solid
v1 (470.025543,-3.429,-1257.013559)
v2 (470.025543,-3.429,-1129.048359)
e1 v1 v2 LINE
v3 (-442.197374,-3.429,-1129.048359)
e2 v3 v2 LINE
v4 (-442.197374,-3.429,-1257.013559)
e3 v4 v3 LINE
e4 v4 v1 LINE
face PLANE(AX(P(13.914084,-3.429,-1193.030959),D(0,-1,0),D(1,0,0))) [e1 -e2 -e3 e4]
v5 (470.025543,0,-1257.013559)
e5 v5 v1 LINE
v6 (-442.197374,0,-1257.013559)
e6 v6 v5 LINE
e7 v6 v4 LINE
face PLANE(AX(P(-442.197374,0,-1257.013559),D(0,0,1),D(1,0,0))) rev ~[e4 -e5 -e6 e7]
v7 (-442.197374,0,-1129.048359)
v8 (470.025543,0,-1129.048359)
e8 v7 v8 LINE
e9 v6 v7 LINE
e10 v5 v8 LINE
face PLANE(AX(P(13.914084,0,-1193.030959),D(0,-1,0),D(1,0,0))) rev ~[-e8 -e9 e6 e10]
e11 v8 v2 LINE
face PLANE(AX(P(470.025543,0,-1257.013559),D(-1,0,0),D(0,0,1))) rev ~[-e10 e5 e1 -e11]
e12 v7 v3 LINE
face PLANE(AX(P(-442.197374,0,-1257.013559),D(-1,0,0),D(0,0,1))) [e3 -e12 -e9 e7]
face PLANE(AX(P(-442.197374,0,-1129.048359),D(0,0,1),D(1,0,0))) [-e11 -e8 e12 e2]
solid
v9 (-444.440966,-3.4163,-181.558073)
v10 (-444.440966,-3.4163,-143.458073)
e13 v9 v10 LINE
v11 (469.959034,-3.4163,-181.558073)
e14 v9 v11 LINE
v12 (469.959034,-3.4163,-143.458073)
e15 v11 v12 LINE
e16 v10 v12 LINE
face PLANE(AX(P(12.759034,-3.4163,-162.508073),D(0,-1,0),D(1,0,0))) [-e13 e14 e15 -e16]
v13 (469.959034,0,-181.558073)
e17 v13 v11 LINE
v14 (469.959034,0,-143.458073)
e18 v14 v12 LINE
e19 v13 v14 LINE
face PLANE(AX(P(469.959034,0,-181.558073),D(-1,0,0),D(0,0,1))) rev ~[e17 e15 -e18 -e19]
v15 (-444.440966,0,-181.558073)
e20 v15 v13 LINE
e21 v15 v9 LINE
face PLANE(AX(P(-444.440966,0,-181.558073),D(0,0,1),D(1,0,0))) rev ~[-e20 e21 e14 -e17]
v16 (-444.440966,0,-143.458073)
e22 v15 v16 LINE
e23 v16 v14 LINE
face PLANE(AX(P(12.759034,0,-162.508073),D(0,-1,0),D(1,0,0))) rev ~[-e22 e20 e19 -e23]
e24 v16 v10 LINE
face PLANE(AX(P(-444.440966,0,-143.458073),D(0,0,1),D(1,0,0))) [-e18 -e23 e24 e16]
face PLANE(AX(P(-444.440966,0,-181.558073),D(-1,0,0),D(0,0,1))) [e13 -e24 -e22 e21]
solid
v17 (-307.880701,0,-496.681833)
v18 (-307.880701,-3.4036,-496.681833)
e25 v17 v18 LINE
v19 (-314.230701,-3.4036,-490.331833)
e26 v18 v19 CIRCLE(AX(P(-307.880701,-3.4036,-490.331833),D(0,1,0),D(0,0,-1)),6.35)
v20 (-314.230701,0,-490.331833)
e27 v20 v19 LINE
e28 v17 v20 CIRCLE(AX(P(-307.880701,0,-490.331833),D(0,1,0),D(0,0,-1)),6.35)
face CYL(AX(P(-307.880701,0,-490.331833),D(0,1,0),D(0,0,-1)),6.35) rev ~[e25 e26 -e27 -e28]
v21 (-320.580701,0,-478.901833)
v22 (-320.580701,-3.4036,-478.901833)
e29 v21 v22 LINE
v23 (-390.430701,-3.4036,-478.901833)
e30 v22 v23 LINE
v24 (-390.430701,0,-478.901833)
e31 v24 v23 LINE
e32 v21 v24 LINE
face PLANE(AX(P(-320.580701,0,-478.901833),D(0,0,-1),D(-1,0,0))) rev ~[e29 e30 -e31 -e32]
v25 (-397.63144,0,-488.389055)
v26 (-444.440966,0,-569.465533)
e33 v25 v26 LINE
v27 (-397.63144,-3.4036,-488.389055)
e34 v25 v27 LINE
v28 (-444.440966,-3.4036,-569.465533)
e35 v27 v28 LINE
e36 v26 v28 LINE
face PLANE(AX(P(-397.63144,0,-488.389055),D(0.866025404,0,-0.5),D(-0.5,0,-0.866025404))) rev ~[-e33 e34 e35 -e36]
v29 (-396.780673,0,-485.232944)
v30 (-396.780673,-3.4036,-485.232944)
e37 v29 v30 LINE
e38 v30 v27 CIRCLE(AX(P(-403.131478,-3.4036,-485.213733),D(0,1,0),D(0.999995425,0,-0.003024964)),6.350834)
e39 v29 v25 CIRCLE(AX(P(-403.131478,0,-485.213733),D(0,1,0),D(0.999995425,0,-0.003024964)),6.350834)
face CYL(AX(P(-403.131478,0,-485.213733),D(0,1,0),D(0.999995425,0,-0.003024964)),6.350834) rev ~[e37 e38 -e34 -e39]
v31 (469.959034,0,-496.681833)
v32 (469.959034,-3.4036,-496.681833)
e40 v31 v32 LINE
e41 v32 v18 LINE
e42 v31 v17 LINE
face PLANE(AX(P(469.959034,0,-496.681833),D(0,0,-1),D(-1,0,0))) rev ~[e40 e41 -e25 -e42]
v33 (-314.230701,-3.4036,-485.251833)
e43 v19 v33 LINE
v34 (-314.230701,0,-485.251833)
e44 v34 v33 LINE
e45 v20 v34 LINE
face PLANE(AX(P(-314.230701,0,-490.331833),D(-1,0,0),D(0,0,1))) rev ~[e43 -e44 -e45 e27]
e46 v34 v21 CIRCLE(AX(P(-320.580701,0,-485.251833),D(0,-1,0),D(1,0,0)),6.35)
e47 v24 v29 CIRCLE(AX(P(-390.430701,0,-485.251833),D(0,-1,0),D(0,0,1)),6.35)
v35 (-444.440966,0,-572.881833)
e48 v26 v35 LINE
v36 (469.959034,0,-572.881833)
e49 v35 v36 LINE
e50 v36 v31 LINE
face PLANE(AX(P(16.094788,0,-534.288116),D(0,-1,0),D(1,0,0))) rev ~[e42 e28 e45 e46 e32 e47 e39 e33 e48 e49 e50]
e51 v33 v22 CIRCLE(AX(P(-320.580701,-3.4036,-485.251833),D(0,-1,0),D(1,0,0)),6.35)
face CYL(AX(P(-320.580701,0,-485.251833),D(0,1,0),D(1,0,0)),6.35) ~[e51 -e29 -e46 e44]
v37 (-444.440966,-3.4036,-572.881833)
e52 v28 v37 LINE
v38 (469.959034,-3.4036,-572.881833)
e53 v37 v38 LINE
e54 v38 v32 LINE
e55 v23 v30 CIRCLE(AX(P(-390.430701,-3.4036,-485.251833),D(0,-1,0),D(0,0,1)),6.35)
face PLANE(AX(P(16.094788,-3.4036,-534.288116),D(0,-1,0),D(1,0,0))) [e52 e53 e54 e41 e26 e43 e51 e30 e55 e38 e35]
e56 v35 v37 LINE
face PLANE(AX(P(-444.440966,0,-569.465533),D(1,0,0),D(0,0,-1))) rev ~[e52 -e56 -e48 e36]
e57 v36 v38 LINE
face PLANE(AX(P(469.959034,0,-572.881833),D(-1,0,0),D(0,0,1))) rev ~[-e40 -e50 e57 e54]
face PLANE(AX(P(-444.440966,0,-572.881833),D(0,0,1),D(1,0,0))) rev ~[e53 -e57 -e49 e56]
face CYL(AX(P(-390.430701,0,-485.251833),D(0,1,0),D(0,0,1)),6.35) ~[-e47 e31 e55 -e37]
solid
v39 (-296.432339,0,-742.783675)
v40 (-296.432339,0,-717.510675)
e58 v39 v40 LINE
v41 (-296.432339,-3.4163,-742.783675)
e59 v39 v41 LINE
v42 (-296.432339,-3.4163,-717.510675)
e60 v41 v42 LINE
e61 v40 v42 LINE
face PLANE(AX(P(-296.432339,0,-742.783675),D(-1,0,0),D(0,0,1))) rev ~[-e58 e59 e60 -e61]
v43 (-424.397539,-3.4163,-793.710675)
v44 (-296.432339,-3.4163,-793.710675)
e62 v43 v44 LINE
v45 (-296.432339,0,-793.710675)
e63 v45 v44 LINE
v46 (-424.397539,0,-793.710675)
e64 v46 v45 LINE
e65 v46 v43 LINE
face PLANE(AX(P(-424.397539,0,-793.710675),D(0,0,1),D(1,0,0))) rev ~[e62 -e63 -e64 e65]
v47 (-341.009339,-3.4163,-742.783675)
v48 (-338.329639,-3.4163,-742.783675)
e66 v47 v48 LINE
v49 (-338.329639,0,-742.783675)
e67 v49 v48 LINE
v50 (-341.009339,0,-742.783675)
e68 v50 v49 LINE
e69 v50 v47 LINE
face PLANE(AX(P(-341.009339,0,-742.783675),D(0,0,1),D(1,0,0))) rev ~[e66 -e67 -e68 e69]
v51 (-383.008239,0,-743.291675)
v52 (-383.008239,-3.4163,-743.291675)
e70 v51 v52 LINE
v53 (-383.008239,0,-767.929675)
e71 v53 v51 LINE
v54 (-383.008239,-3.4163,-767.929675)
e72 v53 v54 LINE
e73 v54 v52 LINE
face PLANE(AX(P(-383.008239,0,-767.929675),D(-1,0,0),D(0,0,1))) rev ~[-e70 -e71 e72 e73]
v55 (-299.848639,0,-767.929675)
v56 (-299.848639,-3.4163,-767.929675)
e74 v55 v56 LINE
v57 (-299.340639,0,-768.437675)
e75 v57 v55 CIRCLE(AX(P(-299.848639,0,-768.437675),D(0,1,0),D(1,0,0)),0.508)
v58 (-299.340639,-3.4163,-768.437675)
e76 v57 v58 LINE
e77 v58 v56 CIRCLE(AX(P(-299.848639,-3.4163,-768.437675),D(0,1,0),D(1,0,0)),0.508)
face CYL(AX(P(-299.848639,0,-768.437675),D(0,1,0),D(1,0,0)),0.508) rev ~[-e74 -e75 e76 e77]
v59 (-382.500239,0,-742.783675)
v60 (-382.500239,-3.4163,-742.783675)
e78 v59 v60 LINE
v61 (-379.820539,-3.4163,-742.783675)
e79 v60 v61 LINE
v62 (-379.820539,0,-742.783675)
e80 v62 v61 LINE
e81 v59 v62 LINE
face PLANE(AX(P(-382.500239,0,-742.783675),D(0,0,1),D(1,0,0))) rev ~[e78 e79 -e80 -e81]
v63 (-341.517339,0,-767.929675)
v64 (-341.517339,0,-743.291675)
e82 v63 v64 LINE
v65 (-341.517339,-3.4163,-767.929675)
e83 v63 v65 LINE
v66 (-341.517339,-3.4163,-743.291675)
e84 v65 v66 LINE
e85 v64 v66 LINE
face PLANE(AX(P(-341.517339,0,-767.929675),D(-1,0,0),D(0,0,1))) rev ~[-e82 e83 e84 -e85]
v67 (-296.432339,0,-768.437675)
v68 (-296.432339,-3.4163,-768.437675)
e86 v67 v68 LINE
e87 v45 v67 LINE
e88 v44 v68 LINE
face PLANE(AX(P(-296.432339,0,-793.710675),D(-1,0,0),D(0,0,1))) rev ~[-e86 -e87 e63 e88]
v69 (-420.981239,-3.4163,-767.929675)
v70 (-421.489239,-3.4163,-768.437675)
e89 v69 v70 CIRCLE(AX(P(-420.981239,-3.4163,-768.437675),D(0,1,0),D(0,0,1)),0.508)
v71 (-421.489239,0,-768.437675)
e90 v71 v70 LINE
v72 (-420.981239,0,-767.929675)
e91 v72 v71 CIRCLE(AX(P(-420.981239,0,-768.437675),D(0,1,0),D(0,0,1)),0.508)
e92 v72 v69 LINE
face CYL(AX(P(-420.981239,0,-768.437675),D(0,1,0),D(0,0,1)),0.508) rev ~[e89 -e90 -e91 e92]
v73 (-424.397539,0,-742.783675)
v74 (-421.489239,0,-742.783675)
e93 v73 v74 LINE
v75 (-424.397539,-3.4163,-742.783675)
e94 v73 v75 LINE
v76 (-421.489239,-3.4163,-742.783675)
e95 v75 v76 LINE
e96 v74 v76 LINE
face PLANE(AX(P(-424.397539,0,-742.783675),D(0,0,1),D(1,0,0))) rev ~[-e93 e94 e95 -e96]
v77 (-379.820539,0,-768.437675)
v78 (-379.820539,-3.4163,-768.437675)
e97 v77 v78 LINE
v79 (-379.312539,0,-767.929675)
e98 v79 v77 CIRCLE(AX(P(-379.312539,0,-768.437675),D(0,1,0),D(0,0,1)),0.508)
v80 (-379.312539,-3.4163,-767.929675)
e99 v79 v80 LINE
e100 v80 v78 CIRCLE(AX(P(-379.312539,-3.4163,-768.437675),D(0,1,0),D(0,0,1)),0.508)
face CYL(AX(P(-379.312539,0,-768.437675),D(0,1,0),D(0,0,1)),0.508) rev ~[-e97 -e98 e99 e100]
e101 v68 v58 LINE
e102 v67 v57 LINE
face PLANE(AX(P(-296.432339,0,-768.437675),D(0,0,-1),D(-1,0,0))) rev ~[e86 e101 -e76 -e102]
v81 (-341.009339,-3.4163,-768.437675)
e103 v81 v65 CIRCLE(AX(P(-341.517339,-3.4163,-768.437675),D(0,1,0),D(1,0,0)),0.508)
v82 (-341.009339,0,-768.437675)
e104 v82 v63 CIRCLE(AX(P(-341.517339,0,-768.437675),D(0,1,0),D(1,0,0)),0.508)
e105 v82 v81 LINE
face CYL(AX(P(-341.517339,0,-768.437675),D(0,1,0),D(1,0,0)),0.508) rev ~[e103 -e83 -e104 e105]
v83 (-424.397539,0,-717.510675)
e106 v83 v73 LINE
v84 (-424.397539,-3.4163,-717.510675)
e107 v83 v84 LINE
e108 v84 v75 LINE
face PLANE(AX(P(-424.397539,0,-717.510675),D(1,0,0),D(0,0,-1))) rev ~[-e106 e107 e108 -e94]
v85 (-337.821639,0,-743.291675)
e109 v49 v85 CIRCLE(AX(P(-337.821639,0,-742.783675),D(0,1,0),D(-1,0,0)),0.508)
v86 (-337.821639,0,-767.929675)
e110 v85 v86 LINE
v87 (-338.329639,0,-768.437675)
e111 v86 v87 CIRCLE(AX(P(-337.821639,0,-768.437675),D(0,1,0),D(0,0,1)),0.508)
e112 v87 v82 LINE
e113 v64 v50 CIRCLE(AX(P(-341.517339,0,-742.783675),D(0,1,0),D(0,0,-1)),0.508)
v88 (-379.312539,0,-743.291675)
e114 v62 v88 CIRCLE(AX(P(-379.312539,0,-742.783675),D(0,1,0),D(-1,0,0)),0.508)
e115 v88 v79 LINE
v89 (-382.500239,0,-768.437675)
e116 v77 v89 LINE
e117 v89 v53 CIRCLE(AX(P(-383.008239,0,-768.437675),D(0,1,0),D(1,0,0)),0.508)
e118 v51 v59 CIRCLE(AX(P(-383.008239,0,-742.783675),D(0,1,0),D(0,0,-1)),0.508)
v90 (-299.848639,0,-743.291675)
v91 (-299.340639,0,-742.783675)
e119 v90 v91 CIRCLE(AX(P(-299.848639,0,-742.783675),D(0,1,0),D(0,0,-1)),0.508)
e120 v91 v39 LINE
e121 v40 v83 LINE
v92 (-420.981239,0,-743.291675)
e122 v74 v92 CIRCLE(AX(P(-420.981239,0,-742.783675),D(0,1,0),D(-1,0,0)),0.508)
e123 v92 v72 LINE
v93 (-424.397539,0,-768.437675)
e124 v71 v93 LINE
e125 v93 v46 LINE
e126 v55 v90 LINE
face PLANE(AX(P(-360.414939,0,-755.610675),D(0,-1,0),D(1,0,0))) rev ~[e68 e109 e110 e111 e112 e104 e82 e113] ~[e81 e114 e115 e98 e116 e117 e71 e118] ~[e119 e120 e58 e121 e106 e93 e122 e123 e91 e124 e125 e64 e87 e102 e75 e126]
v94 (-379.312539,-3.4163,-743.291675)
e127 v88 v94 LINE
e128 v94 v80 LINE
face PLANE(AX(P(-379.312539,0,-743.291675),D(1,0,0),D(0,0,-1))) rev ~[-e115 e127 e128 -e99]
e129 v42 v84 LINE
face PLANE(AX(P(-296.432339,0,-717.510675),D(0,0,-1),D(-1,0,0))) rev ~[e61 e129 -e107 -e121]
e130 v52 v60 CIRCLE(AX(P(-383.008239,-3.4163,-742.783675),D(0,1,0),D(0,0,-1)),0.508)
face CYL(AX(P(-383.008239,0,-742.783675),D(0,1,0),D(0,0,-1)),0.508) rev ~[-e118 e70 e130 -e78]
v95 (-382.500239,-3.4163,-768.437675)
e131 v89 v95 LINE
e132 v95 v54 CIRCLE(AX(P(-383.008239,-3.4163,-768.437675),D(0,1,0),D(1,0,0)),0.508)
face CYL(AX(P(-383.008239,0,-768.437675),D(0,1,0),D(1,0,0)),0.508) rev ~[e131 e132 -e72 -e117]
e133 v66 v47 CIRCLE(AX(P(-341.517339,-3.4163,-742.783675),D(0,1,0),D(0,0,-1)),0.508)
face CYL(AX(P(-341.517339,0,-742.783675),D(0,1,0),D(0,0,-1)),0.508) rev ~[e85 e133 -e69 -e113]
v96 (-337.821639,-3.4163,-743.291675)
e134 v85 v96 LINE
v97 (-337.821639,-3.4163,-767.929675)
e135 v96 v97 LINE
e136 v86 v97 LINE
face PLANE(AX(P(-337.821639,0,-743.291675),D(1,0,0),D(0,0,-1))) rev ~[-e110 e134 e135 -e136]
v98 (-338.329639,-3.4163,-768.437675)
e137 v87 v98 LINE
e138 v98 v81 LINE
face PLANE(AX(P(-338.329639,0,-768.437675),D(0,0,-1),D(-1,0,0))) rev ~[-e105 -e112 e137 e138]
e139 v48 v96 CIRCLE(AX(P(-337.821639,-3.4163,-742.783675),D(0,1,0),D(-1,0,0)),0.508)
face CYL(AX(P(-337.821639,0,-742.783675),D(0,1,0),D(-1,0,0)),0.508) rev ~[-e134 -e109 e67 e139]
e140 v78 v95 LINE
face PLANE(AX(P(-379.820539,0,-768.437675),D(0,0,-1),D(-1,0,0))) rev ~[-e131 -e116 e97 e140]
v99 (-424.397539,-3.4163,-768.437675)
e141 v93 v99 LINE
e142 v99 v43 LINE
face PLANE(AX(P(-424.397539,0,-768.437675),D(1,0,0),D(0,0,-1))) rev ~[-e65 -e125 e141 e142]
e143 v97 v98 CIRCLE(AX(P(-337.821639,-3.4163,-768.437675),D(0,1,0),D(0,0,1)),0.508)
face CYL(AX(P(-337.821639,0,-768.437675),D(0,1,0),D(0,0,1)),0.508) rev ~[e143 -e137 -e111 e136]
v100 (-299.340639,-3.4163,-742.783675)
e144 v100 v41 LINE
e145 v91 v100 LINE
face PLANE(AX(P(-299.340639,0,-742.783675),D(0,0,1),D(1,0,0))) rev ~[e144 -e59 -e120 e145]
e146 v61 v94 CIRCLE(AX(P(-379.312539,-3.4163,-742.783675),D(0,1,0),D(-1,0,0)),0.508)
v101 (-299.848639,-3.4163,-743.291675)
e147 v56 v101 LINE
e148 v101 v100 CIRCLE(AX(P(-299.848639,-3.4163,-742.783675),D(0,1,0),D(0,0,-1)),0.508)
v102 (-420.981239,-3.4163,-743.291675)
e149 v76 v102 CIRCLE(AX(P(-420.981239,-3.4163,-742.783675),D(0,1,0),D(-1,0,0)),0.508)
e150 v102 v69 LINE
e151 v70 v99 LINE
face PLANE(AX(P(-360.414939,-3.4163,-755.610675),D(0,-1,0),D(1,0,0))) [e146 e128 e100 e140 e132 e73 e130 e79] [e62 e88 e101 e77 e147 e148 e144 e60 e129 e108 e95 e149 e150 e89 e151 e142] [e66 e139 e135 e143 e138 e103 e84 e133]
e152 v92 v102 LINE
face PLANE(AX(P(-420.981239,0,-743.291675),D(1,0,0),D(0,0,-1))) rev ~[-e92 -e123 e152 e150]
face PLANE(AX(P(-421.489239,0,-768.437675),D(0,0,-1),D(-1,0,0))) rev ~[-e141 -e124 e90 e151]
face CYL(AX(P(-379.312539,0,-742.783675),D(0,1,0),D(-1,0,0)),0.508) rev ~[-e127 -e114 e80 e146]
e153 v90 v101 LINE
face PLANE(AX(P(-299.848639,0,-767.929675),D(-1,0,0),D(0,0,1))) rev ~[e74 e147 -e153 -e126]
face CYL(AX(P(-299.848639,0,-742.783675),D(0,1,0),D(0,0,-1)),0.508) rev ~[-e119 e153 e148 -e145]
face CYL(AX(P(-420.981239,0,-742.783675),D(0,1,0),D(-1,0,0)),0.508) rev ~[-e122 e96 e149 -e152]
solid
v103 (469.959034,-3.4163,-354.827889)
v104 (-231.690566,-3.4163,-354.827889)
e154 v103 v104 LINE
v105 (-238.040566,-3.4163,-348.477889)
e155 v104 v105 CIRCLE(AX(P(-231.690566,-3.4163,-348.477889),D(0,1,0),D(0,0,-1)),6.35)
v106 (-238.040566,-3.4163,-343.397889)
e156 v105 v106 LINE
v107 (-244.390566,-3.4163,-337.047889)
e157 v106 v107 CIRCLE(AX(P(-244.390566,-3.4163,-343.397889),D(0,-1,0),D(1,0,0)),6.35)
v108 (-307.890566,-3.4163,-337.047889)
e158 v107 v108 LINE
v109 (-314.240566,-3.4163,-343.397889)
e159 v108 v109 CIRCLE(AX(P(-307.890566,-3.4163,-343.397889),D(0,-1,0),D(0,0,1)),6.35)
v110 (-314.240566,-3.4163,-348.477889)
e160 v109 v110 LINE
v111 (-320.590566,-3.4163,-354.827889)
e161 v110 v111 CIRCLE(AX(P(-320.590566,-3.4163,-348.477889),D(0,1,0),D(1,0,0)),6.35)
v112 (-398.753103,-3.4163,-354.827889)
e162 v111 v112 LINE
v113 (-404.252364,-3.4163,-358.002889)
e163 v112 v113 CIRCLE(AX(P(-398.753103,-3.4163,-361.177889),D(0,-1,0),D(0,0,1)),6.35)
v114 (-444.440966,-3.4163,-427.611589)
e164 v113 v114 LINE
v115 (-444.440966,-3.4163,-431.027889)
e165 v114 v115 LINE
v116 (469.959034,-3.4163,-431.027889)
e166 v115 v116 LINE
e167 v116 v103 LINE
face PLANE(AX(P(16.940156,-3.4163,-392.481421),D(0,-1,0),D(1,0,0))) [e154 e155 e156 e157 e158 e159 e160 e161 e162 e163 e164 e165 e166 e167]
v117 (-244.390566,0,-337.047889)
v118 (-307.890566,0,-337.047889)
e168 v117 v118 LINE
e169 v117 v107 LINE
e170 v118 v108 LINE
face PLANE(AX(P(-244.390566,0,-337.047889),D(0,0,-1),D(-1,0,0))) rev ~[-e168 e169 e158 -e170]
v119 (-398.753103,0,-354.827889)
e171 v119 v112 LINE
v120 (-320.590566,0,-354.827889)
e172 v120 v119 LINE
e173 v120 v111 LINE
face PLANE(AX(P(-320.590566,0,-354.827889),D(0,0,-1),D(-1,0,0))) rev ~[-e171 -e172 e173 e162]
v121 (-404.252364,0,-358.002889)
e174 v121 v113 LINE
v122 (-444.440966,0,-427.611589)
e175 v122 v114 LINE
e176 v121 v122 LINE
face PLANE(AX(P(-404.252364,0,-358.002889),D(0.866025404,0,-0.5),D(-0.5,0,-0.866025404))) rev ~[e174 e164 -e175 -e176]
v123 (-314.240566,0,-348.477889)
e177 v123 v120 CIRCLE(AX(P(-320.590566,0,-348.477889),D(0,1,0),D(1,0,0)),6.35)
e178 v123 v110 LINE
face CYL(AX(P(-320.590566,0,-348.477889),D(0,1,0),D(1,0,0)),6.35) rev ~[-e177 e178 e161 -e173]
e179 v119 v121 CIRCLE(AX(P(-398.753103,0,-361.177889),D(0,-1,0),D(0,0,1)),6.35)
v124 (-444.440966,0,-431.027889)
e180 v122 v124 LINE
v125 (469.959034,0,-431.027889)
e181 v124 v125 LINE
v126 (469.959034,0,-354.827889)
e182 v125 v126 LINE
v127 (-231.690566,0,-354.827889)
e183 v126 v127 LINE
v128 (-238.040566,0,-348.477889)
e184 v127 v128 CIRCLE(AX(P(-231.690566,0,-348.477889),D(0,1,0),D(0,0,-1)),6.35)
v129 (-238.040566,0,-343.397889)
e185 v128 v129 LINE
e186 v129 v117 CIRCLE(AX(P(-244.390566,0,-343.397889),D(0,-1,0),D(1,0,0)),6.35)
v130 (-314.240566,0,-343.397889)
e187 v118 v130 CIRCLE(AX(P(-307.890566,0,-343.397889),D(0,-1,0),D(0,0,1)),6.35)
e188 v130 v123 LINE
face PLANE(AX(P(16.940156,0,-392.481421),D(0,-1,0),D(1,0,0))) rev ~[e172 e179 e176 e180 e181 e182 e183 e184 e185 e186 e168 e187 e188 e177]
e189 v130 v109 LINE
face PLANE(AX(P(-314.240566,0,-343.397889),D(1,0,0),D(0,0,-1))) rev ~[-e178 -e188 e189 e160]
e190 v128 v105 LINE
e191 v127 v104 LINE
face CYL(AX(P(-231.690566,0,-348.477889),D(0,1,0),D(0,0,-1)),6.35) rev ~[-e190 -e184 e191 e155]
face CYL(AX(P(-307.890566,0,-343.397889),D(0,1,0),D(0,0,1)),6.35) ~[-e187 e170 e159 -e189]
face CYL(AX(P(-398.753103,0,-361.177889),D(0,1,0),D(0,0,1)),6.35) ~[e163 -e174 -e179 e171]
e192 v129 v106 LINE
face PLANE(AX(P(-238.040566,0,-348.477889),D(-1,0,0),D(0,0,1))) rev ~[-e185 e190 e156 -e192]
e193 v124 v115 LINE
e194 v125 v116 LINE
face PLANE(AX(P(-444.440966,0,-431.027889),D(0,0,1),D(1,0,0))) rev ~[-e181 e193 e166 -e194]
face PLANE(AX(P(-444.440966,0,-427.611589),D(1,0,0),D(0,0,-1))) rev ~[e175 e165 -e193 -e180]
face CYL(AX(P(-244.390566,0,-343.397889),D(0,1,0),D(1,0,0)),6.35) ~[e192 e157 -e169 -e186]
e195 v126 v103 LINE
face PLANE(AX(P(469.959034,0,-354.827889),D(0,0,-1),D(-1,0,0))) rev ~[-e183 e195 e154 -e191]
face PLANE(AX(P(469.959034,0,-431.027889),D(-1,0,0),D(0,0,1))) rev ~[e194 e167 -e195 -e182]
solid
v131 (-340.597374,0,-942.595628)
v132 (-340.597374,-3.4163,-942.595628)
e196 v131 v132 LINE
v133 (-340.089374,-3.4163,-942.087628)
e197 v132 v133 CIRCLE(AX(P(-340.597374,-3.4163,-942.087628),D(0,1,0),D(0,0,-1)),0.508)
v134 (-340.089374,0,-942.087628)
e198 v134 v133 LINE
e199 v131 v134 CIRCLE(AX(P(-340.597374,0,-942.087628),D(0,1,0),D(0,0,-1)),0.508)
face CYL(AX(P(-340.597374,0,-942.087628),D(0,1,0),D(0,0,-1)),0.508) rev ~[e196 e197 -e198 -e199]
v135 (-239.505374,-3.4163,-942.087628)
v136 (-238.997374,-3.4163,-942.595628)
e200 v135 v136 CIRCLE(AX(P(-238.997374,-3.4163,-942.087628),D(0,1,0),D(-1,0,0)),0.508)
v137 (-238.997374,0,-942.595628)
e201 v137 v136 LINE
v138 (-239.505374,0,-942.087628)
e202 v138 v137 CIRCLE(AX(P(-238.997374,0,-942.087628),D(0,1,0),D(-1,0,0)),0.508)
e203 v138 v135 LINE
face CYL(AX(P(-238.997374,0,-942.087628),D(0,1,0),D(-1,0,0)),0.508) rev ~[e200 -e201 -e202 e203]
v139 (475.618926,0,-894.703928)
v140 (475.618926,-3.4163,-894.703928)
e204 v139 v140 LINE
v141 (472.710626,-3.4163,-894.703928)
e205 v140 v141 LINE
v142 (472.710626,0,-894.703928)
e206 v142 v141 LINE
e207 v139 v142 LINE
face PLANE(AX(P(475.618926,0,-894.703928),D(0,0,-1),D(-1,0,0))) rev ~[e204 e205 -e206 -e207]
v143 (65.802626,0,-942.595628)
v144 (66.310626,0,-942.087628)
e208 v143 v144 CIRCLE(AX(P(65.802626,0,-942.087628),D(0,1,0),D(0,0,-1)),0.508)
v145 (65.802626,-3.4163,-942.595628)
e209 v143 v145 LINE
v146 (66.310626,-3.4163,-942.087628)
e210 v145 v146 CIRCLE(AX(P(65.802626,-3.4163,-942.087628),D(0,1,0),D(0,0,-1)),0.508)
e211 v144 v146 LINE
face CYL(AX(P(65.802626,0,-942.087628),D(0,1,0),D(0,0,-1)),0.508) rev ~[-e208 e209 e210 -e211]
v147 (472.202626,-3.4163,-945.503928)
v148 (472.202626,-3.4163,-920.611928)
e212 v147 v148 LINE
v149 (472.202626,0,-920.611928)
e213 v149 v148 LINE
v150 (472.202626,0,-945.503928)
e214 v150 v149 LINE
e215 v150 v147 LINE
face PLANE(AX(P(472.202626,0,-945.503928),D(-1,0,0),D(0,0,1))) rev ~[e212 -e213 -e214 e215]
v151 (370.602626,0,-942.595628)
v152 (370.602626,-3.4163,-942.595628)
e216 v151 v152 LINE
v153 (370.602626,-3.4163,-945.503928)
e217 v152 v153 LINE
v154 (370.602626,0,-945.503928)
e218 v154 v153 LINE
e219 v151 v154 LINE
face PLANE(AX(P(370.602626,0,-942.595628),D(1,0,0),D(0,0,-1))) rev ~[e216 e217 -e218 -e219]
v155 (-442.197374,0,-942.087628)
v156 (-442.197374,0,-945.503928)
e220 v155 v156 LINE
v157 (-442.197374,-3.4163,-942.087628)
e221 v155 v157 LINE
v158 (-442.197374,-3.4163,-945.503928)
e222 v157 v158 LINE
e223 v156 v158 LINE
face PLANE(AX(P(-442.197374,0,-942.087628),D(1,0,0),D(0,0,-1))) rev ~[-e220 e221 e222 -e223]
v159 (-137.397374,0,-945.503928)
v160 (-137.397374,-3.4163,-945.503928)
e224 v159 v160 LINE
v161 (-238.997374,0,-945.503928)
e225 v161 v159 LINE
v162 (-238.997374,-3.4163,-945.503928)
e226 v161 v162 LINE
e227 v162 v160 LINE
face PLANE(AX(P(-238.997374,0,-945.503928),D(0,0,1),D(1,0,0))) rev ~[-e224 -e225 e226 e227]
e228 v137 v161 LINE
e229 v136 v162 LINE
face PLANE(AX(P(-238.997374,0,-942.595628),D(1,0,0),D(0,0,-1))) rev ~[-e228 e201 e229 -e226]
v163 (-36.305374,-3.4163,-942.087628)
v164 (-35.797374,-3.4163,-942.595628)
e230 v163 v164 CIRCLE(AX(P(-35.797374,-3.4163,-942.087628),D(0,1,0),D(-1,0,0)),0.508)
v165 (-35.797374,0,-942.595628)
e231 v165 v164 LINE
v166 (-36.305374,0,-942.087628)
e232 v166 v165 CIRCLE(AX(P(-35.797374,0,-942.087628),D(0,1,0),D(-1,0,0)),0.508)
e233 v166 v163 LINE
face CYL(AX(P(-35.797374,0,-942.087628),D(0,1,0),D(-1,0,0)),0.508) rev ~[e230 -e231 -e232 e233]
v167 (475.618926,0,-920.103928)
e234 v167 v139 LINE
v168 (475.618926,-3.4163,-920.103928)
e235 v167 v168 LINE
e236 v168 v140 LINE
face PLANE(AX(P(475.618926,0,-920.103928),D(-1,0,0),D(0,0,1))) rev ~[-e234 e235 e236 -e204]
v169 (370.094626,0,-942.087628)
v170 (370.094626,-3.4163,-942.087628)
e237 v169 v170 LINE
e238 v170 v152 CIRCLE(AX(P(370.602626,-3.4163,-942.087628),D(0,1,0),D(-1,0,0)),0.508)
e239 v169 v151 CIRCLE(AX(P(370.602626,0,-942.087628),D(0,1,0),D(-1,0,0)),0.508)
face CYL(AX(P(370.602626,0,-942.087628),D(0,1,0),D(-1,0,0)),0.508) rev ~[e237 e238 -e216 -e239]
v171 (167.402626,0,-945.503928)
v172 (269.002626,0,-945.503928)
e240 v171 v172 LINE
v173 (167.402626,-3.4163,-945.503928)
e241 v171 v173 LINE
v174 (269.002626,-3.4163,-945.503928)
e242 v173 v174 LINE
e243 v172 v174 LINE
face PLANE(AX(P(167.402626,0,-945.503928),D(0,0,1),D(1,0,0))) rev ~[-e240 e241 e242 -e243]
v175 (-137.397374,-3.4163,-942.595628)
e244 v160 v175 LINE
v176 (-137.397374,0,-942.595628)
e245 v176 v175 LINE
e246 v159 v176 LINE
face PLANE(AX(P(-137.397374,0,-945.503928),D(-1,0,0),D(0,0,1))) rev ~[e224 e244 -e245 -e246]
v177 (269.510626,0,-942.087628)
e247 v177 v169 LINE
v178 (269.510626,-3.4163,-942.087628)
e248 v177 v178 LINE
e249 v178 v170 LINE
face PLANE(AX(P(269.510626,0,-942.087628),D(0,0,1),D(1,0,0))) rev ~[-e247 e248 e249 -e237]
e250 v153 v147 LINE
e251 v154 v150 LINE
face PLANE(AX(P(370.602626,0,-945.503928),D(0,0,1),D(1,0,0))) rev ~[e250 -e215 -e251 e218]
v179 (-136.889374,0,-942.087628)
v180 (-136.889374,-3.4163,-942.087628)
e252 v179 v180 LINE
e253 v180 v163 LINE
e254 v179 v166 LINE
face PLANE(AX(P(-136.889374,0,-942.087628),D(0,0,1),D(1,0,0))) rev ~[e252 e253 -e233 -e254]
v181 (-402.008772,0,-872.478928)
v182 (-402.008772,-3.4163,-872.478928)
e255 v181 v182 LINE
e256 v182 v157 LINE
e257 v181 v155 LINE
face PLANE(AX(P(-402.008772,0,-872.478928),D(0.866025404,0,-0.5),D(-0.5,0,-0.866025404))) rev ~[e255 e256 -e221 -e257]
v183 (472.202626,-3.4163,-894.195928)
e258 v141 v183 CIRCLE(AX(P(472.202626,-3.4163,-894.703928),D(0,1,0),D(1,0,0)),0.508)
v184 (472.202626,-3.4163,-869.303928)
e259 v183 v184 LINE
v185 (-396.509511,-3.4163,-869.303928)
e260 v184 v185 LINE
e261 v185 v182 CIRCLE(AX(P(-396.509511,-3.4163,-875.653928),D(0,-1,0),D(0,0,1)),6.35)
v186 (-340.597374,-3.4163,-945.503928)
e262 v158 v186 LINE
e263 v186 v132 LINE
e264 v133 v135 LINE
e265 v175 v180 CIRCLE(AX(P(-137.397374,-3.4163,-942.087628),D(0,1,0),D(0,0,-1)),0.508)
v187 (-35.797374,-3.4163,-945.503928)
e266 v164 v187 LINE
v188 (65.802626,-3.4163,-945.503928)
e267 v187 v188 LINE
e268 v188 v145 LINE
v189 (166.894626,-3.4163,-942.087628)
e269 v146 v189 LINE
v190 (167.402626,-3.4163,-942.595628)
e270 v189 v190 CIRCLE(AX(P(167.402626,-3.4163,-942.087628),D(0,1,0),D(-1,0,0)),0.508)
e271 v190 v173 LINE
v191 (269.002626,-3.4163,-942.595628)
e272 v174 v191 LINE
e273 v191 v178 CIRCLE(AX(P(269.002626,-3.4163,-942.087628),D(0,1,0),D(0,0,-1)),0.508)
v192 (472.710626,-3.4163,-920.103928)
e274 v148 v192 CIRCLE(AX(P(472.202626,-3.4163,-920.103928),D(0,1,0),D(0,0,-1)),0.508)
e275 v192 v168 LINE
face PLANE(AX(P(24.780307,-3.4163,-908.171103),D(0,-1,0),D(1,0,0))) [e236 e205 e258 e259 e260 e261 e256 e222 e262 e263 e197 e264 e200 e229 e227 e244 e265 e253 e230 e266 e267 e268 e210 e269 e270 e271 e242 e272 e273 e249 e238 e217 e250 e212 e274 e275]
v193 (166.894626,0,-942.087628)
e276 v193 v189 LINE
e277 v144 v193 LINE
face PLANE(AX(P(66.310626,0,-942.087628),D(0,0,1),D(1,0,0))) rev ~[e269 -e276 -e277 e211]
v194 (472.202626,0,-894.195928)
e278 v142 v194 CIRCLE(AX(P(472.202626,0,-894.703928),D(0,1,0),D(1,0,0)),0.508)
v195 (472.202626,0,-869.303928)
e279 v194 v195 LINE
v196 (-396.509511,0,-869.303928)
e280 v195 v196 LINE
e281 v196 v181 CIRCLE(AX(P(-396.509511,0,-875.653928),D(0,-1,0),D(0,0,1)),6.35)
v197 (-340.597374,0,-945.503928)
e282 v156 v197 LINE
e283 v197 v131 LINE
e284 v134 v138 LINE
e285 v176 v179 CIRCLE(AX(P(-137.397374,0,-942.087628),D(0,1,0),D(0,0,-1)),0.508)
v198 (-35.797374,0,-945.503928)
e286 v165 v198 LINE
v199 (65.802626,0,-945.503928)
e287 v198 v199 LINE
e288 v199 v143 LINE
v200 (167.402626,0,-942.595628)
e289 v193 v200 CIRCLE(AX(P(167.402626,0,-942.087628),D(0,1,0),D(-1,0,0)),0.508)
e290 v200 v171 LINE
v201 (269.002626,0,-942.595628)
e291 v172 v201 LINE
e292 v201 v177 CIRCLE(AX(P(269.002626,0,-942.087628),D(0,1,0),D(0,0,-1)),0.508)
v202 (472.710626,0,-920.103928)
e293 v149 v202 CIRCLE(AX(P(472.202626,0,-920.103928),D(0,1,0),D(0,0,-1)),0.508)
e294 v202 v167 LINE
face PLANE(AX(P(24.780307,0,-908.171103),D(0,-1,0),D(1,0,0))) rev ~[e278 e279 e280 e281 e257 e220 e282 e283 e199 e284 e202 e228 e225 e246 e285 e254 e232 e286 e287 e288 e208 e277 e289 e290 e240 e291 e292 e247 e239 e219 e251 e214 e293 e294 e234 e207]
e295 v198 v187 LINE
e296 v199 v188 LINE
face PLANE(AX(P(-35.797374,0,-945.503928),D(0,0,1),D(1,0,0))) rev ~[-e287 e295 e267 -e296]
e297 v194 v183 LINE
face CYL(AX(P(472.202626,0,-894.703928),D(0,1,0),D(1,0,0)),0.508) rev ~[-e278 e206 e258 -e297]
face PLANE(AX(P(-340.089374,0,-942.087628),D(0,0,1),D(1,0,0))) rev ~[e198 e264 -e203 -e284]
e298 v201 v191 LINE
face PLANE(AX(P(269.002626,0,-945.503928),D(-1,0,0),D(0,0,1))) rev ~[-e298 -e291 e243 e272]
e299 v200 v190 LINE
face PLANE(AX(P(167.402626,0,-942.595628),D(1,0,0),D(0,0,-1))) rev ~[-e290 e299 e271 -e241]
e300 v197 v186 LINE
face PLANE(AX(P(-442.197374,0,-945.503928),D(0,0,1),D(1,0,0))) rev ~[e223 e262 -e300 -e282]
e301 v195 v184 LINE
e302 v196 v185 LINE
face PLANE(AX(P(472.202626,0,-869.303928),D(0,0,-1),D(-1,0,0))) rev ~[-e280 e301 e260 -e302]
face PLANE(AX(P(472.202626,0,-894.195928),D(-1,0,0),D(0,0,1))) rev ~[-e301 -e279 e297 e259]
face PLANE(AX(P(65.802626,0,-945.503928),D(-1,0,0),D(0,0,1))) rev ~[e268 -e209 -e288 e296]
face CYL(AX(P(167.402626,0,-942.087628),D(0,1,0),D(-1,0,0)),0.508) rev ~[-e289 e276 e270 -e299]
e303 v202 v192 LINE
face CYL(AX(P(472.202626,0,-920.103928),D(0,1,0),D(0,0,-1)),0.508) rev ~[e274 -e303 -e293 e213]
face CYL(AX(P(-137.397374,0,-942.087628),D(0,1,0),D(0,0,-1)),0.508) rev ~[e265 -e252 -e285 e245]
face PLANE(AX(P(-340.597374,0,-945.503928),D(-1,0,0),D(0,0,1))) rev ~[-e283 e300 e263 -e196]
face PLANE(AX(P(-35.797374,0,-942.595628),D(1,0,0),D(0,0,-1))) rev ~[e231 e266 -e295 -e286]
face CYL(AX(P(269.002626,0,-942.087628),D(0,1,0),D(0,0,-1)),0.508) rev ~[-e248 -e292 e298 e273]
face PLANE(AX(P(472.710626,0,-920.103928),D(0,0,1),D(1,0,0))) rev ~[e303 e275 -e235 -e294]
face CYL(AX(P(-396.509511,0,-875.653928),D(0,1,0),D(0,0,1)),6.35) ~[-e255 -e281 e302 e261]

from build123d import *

# Parameters (mm, degrees)
F1_W      = 914.4
F1_H      = 38.1
F2_DEPTH  = 3.4163
F4_DEPTH  = 3.4163
F6_DEPTH  = 3.4036
F8_DEPTH  = 3.4163
F10_DEPTH = 3.4163
F11_W     = 912.2229164778
F11_H     = 127.9652
F12_DEPTH = 3.429


# Not quite as in the source:
# - ends of sketch curves that miss each other by under 0.0002 mm in the source are joined


with BuildPart() as f2:
    # F1 (on Front) → F2 (new body)
    with BuildSketch(Plane.XZ):
        with Locations((12.759034133, -162.508072567)):
            Rectangle(F1_W, F1_H)
    extrude(amount=F2_DEPTH)


with BuildPart() as f4:
    # F3 (on Front) → F4 (new body)
    with BuildSketch(Plane.XZ):
        with BuildLine():
            Line((-320.590565867, -354.8278894318), (-398.7531028701, -354.8278894318))
            ThreePointArc((-398.7531028701, -354.8278894318), (-401.9281028701, -355.6786281177), (-404.2523641841, -358.0028894318))
            Line((-404.2523641841, -358.0028894318), (-444.440965867, -427.6115894318))
            Line((-444.440965867, -427.6115894318), (-444.440965867, -431.0278894318))
            Line((-444.440965867, -431.0278894318), (469.959034133, -431.0278894318))
            Line((469.959034133, -431.0278894318), (469.959034133, -354.8278894318))
            Line((469.959034133, -354.8278894318), (-231.690565867, -354.8278894318))
            ThreePointArc((-231.690565867, -354.8278894318), (-236.1806939276, -352.9680174923), (-238.040565867, -348.4778894318))
            Line((-238.040565867, -348.4778894318), (-238.040565867, -343.3978894318))
            ThreePointArc((-238.040565867, -343.3978894318), (-239.9004378065, -338.9077613712), (-244.390565867, -337.0478894318))
            Line((-244.390565867, -337.0478894318), (-307.890565867, -337.0478894318))
            ThreePointArc((-307.890565867, -337.0478894318), (-312.3806939276, -338.9077613712), (-314.240565867, -343.3978894318))
            Line((-314.240565867, -343.3978894318), (-314.240565867, -348.4778894318))
            ThreePointArc((-314.240565867, -348.4778894318), (-316.1004378065, -352.9680174923), (-320.590565867, -354.8278894318))
        make_face()
    extrude(amount=F4_DEPTH)


with BuildPart() as f6:
    # F5 (on Front) → F6 (new body)
    with BuildSketch(Plane.XZ):
        with BuildLine():
            Line((469.959034133, -572.8818325169), (469.959034133, -496.6818325169))
            Line((469.959034133, -496.6818325169), (-307.8807011454, -496.6818325169))
            ThreePointArc((-307.8807011454, -496.6818325169), (-312.370829206, -494.8219605774), (-314.2307011454, -490.3318325169))
            Line((-314.2307011454, -490.3318325169), (-314.2307011454, -485.2518325169))
            ThreePointArc((-314.2307011454, -485.2518325169), (-316.0905730849, -480.7617044564), (-320.5807011454, -478.9018325169))
            Line((-320.5807011454, -478.9018325169), (-390.4307011454, -478.9018325169))
            ThreePointArc((-390.4307011454, -478.9018325169), (-394.9141460418, -480.7550312247), (-396.780673052, -485.2329437416))
            ThreePointArc((-396.780673052, -485.2329437416), (-396.9995232777, -486.8666766847), (-397.6314398314, -488.389055145))
            Line((-397.6314398314, -488.389055145), (-444.440965867, -569.4655325169))
            Line((-444.440965867, -569.4655325169), (-444.440965867, -572.8818325169))
            Line((-444.440965867, -572.8818325169), (469.959034133, -572.8818325169))
        make_face()
    extrude(amount=F6_DEPTH)


with BuildPart() as f8:
    # F7 (on Front) → F8 (new body)
    with BuildSketch(Plane.XZ):
        with BuildLine():
            Line((-296.4323394764, -717.5106746197), (-424.3975394764, -717.5106746197))
            Line((-424.3975394764, -717.5106746197), (-424.3975394764, -742.7836746197))
            Line((-424.3975394764, -742.7836746197), (-421.4892394764, -742.7836746197))
            ThreePointArc((-421.4892394764, -742.7836746197), (-420.6220292316, -742.4244643748), (-420.9812394764, -743.2916746197))
            Line((-420.9812394764, -743.2916746197), (-420.9812394764, -755.6106746197))
            Line((-420.9812394764, -755.6106746197), (-420.9812394764, -767.9296746197))
            ThreePointArc((-420.9812394764, -767.9296746197), (-420.6220292316, -768.7968848645), (-421.4892394764, -768.4376746197))
            Line((-421.4892394764, -768.4376746197), (-424.3975394764, -768.4376746197))
            Line((-424.3975394764, -768.4376746197), (-424.3975394764, -793.7106746197))
            Line((-424.3975394764, -793.7106746197), (-296.4323394764, -793.7106746197))
            Line((-296.4323394764, -793.7106746197), (-296.4323394764, -768.4376746197))
            Line((-296.4323394764, -768.4376746197), (-299.3406394764, -768.4376746197))
            ThreePointArc((-299.3406394764, -768.4376746197), (-300.2078497213, -768.7968848645), (-299.8486394764, -767.9296746197))
            Line((-299.8486394764, -767.9296746197), (-299.8486394764, -755.6106746197))
            Line((-299.8486394764, -755.6106746197), (-299.8486394764, -743.2916746197))
            ThreePointArc((-299.8486394764, -743.2916746197), (-300.2078497213, -742.4244643748), (-299.3406394764, -742.7836746197))
            Line((-299.3406394764, -742.7836746197), (-296.4323394764, -742.7836746197))
            Line((-296.4323394764, -742.7836746197), (-296.4323394764, -717.5106746197))
        make_face()
        with BuildLine():
            Line((-383.0082394764, -755.6106746197), (-383.0082394764, -743.2916746197))
            ThreePointArc((-383.0082394764, -743.2916746197), (-383.3674497213, -742.4244643748), (-382.5002394764, -742.7836746197))
            Line((-382.5002394764, -742.7836746197), (-379.8205394764, -742.7836746197))
            ThreePointArc((-379.8205394764, -742.7836746197), (-378.9533292316, -742.4244643748), (-379.3125394764, -743.2916746197))
            Line((-379.3125394764, -743.2916746197), (-379.3125394764, -755.6106746197))
            Line((-379.3125394764, -755.6106746197), (-379.3125394764, -767.9296746197))
            ThreePointArc((-379.3125394764, -767.9296746197), (-378.9533292316, -768.7968848645), (-379.8205394764, -768.4376746197))
            Line((-379.8205394764, -768.4376746197), (-382.5002394764, -768.4376746197))
            ThreePointArc((-382.5002394764, -768.4376746197), (-383.3674497213, -768.7968848645), (-383.0082394764, -767.9296746197))
            Line((-383.0082394764, -767.9296746197), (-383.0082394764, -755.6106746197))
        make_face(mode=Mode.SUBTRACT)
        with BuildLine():
            Line((-341.5173394764, -755.6106746197), (-341.5173394764, -743.2916746197))
            ThreePointArc((-341.5173394764, -743.2916746197), (-341.8765497213, -742.4244643748), (-341.0093394764, -742.7836746197))
            Line((-341.0093394764, -742.7836746197), (-338.3296394764, -742.7836746197))
            ThreePointArc((-338.3296394764, -742.7836746197), (-337.4624292316, -742.4244643748), (-337.8216394764, -743.2916746197))
            Line((-337.8216394764, -743.2916746197), (-337.8216394764, -755.6106746197))
            Line((-337.8216394764, -755.6106746197), (-337.8216394764, -767.9296746197))
            ThreePointArc((-337.8216394764, -767.9296746197), (-337.4624292316, -768.7968848645), (-338.3296394764, -768.4376746197))
            Line((-338.3296394764, -768.4376746197), (-341.0093394764, -768.4376746197))
            ThreePointArc((-341.0093394764, -768.4376746197), (-341.8765497213, -768.7968848645), (-341.5173394764, -767.9296746197))
            Line((-341.5173394764, -767.9296746197), (-341.5173394764, -755.6106746197))
        make_face(mode=Mode.SUBTRACT)
    extrude(amount=F8_DEPTH)


with BuildPart() as f10:
    # F9 (on Front) → F10 (new body)
    with BuildSketch(Plane.XZ):
        with BuildLine():
            Line((-442.1973738139, -942.08762847), (-442.1973738139, -945.50392847))
            Line((-442.1973738139, -945.50392847), (-340.5973738139, -945.50392847))
            Line((-340.5973738139, -945.50392847), (-340.5973738139, -942.59562847))
            ThreePointArc((-340.5973738139, -942.59562847), (-340.9565840588, -941.7284182251), (-340.0893738139, -942.08762847))
            Line((-340.0893738139, -942.08762847), (-239.5053738139, -942.08762847))
            ThreePointArc((-239.5053738139, -942.08762847), (-238.6381635691, -941.7284182251), (-238.9973738139, -942.59562847))
            Line((-238.9973738139, -942.59562847), (-238.9973738139, -945.50392847))
            Line((-238.9973738139, -945.50392847), (-137.3973738139, -945.50392847))
            Line((-137.3973738139, -945.50392847), (-137.3973738139, -942.59562847))
            ThreePointArc((-137.3973738139, -942.59562847), (-137.7565840588, -941.7284182251), (-136.8893738139, -942.08762847))
            Line((-136.8893738139, -942.08762847), (-36.3053738139, -942.08762847))
            ThreePointArc((-36.3053738139, -942.08762847), (-35.4381635691, -941.7284182251), (-35.7973738139, -942.59562847))
            Line((-35.7973738139, -942.59562847), (-35.7973738139, -945.50392847))
            Line((-35.7973738139, -945.50392847), (65.8026261861, -945.50392847))
            Line((65.8026261861, -945.50392847), (65.8026261861, -942.59562847))
            ThreePointArc((65.8026261861, -942.59562847), (65.4434159412, -941.7284182251), (66.3106261861, -942.08762847))
            Line((66.3106261861, -942.08762847), (166.8946261861, -942.08762847))
            ThreePointArc((166.8946261861, -942.08762847), (167.7618364309, -941.7284182251), (167.4026261861, -942.59562847))
            Line((167.4026261861, -942.59562847), (167.4026261861, -945.50392847))
            Line((167.4026261861, -945.50392847), (269.0026261861, -945.50392847))
            Line((269.0026261861, -945.50392847), (269.0026261861, -942.59562847))
            ThreePointArc((269.0026261861, -942.59562847), (268.6434159412, -941.7284182251), (269.5106261861, -942.08762847))
            Line((269.5106261861, -942.08762847), (370.0946261861, -942.08762847))
            ThreePointArc((370.0946261861, -942.08762847), (370.9618364309, -941.7284182251), (370.6026261861, -942.59562847))
            Line((370.6026261861, -942.59562847), (370.6026261861, -945.50392847))
            Line((370.6026261861, -945.50392847), (472.2026261861, -945.50392847))
            Line((472.2026261861, -945.50392847), (472.2026261861, -920.61192847))
            ThreePointArc((472.2026261861, -920.61192847), (471.8434159412, -919.7447182251), (472.7106261861, -920.10392847))
            Line((472.7106261861, -920.10392847), (475.6189261861, -920.10392847))
            Line((475.6189261861, -920.10392847), (475.6189261861, -907.40392847))
            Line((475.6189261861, -907.40392847), (475.6189261861, -894.70392847))
            Line((475.6189261861, -894.70392847), (472.7106261861, -894.70392847))
            ThreePointArc((472.7106261861, -894.70392847), (471.8434159412, -895.0631387148), (472.2026261861, -894.19592847))
            Line((472.2026261861, -894.19592847), (472.2026261861, -869.30392847))
            Line((472.2026261861, -869.30392847), (-396.5095108169, -869.30392847))
            ThreePointArc((-396.5095108169, -869.30392847), (-399.6845108169, -870.1546671559), (-402.008772131, -872.47892847))
            Line((-402.008772131, -872.47892847), (-442.1973738139, -942.08762847))
        make_face()
    extrude(amount=F10_DEPTH)


with BuildPart() as f12:
    # F11 (on Front) → F12 (new body)
    with BuildSketch(Plane.XZ):
        with Locations((13.914084425, -1193.0309593414)):
            Rectangle(F11_W, F11_H)
    extrude(amount=F12_DEPTH)


solid = Compound([f2.part, f4.part, f6.part, f8.part, f10.part, f12.part])
